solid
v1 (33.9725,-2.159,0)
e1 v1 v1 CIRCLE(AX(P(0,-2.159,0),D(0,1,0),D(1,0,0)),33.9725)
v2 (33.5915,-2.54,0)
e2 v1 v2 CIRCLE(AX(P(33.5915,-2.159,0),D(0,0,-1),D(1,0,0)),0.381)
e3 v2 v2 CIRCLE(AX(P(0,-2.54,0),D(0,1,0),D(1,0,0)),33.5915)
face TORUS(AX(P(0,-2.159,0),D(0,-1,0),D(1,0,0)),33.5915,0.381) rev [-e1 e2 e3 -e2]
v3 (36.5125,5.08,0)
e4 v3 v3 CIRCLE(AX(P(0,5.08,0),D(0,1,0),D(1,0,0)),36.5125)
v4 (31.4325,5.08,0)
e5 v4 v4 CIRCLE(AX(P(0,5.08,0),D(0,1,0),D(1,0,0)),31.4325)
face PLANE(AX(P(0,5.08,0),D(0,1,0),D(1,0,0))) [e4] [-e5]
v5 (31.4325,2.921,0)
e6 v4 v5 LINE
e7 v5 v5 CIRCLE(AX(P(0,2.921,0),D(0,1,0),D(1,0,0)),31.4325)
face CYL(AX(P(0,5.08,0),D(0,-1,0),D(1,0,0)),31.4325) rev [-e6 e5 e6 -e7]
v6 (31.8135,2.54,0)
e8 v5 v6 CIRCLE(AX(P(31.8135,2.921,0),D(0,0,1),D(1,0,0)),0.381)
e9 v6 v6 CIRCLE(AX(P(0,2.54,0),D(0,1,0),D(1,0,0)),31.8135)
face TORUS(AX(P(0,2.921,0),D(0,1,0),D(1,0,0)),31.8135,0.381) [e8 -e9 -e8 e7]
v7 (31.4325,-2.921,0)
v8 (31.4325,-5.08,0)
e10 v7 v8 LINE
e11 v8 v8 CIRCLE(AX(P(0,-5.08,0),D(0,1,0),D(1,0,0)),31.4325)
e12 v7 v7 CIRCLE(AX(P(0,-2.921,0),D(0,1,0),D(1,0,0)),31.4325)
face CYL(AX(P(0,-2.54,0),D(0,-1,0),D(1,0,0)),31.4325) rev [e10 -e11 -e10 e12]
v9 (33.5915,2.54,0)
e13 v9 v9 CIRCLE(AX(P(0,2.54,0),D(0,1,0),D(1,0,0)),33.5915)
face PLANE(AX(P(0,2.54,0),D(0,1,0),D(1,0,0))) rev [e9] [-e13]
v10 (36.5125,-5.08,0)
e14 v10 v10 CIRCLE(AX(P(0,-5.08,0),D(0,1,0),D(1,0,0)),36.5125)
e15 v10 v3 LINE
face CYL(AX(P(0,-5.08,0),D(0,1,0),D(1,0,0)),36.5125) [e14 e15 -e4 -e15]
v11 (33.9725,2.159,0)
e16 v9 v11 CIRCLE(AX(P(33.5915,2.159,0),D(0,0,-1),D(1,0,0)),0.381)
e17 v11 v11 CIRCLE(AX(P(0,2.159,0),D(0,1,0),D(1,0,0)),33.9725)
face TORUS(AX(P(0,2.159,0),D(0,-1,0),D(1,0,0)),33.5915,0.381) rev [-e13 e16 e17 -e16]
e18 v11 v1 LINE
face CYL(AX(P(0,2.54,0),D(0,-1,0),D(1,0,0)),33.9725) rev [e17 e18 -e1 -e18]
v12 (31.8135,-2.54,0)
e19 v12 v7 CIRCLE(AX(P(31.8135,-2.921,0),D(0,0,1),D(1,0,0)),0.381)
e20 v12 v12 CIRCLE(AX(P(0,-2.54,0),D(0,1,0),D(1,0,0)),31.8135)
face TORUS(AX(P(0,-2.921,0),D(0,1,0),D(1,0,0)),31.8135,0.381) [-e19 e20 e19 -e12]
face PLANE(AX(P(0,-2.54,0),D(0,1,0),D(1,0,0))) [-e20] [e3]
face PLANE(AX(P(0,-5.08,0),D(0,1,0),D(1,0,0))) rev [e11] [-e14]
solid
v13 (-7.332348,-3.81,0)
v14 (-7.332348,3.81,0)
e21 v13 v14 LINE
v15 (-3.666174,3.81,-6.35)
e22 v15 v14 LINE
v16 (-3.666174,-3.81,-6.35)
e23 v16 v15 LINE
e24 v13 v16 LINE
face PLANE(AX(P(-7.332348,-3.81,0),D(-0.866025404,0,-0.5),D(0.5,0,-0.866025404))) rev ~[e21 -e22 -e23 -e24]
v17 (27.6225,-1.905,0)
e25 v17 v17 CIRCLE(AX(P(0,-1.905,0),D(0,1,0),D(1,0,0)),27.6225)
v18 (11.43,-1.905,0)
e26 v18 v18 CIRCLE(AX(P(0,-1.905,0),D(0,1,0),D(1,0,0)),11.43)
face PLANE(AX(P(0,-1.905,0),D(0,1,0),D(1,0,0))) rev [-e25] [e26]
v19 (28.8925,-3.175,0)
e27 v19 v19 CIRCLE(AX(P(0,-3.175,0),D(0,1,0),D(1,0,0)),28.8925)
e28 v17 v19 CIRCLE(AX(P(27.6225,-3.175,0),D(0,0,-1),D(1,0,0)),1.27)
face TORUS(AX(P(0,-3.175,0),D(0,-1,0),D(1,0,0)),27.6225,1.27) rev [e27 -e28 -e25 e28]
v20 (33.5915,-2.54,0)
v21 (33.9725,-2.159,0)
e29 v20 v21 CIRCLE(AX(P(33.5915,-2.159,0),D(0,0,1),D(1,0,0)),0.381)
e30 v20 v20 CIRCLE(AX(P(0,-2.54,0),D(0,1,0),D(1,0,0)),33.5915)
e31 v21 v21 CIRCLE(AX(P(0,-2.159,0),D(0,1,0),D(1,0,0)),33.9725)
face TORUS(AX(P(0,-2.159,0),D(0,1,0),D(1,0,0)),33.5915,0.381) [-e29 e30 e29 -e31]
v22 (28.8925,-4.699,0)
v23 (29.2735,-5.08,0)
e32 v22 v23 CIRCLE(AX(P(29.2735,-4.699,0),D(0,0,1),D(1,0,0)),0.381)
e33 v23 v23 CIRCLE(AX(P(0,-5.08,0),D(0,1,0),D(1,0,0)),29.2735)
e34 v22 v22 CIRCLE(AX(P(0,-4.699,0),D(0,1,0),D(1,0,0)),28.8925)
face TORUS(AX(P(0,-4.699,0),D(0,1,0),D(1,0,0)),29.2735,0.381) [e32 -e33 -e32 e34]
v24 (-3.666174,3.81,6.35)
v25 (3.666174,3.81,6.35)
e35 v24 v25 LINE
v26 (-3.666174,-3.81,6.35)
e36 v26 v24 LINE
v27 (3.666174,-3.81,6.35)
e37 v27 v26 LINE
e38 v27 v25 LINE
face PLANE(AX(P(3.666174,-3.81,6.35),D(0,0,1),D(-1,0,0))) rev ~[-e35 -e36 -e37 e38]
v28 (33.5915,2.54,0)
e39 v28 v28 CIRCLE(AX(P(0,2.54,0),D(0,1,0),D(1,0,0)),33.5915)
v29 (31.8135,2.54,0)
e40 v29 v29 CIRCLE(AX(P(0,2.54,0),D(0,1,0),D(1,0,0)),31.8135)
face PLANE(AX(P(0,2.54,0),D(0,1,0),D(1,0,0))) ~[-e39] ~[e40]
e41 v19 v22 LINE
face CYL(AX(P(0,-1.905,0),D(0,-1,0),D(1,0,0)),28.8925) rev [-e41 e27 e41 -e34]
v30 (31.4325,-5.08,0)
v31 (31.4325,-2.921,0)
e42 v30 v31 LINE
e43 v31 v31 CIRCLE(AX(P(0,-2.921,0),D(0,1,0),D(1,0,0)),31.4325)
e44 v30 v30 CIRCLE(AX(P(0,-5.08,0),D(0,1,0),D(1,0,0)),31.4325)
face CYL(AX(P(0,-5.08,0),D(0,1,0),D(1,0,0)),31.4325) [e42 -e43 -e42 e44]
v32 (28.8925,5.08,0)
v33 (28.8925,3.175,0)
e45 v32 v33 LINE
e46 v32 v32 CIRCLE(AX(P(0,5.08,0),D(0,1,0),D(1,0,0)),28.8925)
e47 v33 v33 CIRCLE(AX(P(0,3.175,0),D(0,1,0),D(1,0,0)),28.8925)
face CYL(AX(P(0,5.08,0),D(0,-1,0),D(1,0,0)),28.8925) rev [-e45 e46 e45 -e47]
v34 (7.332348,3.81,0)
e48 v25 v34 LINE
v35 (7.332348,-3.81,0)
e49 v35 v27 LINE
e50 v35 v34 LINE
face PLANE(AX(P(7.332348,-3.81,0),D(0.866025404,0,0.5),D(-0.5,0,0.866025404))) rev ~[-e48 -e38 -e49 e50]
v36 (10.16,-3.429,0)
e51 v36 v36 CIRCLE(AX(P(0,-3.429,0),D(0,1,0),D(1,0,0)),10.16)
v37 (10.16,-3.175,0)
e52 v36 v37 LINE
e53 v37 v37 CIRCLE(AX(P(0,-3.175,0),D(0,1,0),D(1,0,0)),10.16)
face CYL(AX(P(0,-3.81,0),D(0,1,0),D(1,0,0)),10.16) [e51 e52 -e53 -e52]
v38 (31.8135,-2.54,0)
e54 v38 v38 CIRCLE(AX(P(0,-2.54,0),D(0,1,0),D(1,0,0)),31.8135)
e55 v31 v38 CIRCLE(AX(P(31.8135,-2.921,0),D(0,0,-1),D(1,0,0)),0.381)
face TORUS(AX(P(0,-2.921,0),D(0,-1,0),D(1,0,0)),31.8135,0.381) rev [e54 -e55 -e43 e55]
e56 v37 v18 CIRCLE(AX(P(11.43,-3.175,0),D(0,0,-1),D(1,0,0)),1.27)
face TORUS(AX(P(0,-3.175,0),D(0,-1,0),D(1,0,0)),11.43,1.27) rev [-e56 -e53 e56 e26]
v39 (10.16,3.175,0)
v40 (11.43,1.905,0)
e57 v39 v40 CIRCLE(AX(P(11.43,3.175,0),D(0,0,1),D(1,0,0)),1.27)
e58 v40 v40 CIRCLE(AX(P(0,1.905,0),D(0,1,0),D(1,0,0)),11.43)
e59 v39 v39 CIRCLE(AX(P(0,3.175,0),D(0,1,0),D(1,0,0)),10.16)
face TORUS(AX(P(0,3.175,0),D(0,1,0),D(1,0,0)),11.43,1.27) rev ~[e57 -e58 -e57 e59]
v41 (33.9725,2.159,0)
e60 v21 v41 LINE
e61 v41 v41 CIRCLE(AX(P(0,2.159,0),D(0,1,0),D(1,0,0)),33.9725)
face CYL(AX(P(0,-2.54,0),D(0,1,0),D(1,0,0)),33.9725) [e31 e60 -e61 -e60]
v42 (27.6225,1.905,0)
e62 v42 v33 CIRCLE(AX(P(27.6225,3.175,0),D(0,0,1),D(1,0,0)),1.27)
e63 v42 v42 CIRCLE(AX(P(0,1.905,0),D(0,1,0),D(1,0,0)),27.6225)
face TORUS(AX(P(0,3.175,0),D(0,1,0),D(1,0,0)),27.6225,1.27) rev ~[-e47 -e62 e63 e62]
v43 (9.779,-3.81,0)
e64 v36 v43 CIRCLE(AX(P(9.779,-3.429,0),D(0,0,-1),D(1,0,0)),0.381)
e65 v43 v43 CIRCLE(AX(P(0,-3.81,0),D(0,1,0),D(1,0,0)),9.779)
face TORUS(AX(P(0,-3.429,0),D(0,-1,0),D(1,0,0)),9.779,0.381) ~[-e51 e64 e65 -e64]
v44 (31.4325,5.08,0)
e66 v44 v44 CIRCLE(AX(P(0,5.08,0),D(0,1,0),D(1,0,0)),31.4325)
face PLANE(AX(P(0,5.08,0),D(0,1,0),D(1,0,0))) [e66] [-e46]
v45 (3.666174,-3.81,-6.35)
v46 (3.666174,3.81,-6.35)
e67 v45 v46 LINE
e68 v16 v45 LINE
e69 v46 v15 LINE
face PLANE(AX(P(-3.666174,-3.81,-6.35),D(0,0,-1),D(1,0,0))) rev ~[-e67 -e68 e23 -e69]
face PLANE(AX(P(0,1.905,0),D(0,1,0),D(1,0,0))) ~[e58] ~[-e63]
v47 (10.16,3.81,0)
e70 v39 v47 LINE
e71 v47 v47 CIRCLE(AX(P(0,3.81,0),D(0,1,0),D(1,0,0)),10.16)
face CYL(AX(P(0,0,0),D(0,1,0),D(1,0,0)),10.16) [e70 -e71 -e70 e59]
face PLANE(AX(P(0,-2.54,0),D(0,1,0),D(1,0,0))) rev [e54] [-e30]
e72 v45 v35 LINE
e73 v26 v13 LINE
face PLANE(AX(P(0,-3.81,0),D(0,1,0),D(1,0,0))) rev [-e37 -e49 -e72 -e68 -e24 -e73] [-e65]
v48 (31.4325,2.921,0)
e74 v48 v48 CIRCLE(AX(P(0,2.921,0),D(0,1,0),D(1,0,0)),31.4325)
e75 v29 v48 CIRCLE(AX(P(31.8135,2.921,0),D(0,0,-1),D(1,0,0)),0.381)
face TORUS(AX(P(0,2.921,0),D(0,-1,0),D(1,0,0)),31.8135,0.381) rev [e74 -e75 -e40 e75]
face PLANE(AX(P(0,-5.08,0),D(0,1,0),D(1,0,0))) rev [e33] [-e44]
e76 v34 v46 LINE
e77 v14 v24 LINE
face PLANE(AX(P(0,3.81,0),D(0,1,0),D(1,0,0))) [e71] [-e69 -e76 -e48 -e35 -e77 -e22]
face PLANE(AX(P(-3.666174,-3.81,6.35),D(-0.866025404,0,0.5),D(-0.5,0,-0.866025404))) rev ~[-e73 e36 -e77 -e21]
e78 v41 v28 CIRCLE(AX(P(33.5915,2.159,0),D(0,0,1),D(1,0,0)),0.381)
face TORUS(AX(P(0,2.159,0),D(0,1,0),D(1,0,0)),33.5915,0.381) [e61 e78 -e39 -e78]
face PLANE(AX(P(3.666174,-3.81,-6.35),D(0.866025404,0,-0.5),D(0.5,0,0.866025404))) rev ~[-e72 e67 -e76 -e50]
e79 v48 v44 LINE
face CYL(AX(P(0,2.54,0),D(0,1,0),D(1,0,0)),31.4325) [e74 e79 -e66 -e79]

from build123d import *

# Parameters (mm, degrees)
F0_W     = 18.7325
F0_H     = 1.905
F0_W_2   = 2.54
F0_H_2   = 2.54
F3_DEPTH = 8.891
F8_R     = 1.27
F9_R     = 0.381
F10_R    = 0.381
F11_R    = 0.381


# Not quite as in the source:
# - a variable given as a bare number and used for a length is read in inches; the dataset says mm whatever the document's units were


with BuildPart() as f1:
    # F0 (on Top) → F1 (revolve)
    with BuildSketch(Plane.XY):
        Polygon((0, 3.81), (0, 0), (10.16, 0), (10.16, 1.905), (10.16, 3.81), align=None)
        with Locations((19.52625, 0.9525)):
            Rectangle(F0_W, F0_H)
        Polygon((10.16, 0), (0, 0), (0, -3.81), (10.16, -3.81), (10.16, -1.905), align=None)
        with Locations((19.52625, -0.9525)):
            Rectangle(F0_W, F0_H)
        with Locations((32.7025, -1.27)):
            Rectangle(F0_W_2, F0_H_2)
        with Locations((32.7025, 1.27)):
            Rectangle(F0_W_2, F0_H_2)
        Polygon((28.8925, 1.905), (28.8925, 0), (31.4325, 0), (31.4325, 2.54), (31.4325, 5.08), (28.8925, 5.08), align=None)
        Polygon((31.4325, 0), (28.8925, 0), (28.8925, -1.905), (28.8925, -5.08), (31.4325, -5.08), (31.4325, -2.54), align=None)
    revolve(axis=Axis((0, 1.905, 0), (0, 1, 0)))

    # F2 (on face) → F3 (cut, through all)
    with BuildSketch(Plane.XZ.offset(3.81)):
        Polygon((3.6661742094, 6.35), (-3.6661742094, 6.35), (-7.3323484187, 0), (-3.6661742094, -6.35), (3.6661742094, -6.35), (7.3323484187, 0), align=None)
    extrude(amount=-F3_DEPTH, mode=Mode.SUBTRACT)

    # F8
    f8_edges = [f1.edges().sort_by_distance(p)[0] for p in [
        (-28.8925, -1.905, 0),
        (-10.16, -1.905, 0),
        (-28.8925, 1.905, 0),
        (-10.16, 1.905, 0),
    ]]
    fillet(f8_edges, radius=F8_R)

    # F9
    f9_edges = [f1.edges().sort_by_distance(p)[0] for p in [
        (-28.8925, -5.08, 0),
        (-10.16, -3.81, 0),
    ]]
    fillet(f9_edges, radius=F9_R)

    # F10
    f10_edges = [f1.edges().sort_by_distance(p)[0] for p in [
        (-31.4325, -2.54, 0),
        (-33.9725, -2.54, 0),
        (-31.4325, 2.54, 0),
        (-33.9725, 2.54, 0),
    ]]
    fillet(f10_edges, radius=F10_R)


with BuildPart() as f5:
    # F4 (on Top) → F5 (revolve)
    with BuildSketch(Plane.XY):
        Polygon((31.4325, 5.08), (31.4325, 2.54), (33.9725, 2.54), (33.9725, 0), (33.9725, -2.54), (31.4325, -2.54), (31.4325, -5.08), (36.5125, -5.08), (36.5125, 5.08), align=None)
    revolve(axis=Axis((0, 1.905, 0), (0, 1, 0)))

    # F11
    f11_edges = [f5.edges().sort_by_distance(p)[0] for p in [
        (-33.9725, 2.54, 0),
        (-31.4325, 2.54, 0),
        (-31.4325, -2.54, 0),
        (-33.9725, -2.54, 0),
    ]]
    fillet(f11_edges, radius=F11_R)


solid = Compound([f1.part, f5.part])
